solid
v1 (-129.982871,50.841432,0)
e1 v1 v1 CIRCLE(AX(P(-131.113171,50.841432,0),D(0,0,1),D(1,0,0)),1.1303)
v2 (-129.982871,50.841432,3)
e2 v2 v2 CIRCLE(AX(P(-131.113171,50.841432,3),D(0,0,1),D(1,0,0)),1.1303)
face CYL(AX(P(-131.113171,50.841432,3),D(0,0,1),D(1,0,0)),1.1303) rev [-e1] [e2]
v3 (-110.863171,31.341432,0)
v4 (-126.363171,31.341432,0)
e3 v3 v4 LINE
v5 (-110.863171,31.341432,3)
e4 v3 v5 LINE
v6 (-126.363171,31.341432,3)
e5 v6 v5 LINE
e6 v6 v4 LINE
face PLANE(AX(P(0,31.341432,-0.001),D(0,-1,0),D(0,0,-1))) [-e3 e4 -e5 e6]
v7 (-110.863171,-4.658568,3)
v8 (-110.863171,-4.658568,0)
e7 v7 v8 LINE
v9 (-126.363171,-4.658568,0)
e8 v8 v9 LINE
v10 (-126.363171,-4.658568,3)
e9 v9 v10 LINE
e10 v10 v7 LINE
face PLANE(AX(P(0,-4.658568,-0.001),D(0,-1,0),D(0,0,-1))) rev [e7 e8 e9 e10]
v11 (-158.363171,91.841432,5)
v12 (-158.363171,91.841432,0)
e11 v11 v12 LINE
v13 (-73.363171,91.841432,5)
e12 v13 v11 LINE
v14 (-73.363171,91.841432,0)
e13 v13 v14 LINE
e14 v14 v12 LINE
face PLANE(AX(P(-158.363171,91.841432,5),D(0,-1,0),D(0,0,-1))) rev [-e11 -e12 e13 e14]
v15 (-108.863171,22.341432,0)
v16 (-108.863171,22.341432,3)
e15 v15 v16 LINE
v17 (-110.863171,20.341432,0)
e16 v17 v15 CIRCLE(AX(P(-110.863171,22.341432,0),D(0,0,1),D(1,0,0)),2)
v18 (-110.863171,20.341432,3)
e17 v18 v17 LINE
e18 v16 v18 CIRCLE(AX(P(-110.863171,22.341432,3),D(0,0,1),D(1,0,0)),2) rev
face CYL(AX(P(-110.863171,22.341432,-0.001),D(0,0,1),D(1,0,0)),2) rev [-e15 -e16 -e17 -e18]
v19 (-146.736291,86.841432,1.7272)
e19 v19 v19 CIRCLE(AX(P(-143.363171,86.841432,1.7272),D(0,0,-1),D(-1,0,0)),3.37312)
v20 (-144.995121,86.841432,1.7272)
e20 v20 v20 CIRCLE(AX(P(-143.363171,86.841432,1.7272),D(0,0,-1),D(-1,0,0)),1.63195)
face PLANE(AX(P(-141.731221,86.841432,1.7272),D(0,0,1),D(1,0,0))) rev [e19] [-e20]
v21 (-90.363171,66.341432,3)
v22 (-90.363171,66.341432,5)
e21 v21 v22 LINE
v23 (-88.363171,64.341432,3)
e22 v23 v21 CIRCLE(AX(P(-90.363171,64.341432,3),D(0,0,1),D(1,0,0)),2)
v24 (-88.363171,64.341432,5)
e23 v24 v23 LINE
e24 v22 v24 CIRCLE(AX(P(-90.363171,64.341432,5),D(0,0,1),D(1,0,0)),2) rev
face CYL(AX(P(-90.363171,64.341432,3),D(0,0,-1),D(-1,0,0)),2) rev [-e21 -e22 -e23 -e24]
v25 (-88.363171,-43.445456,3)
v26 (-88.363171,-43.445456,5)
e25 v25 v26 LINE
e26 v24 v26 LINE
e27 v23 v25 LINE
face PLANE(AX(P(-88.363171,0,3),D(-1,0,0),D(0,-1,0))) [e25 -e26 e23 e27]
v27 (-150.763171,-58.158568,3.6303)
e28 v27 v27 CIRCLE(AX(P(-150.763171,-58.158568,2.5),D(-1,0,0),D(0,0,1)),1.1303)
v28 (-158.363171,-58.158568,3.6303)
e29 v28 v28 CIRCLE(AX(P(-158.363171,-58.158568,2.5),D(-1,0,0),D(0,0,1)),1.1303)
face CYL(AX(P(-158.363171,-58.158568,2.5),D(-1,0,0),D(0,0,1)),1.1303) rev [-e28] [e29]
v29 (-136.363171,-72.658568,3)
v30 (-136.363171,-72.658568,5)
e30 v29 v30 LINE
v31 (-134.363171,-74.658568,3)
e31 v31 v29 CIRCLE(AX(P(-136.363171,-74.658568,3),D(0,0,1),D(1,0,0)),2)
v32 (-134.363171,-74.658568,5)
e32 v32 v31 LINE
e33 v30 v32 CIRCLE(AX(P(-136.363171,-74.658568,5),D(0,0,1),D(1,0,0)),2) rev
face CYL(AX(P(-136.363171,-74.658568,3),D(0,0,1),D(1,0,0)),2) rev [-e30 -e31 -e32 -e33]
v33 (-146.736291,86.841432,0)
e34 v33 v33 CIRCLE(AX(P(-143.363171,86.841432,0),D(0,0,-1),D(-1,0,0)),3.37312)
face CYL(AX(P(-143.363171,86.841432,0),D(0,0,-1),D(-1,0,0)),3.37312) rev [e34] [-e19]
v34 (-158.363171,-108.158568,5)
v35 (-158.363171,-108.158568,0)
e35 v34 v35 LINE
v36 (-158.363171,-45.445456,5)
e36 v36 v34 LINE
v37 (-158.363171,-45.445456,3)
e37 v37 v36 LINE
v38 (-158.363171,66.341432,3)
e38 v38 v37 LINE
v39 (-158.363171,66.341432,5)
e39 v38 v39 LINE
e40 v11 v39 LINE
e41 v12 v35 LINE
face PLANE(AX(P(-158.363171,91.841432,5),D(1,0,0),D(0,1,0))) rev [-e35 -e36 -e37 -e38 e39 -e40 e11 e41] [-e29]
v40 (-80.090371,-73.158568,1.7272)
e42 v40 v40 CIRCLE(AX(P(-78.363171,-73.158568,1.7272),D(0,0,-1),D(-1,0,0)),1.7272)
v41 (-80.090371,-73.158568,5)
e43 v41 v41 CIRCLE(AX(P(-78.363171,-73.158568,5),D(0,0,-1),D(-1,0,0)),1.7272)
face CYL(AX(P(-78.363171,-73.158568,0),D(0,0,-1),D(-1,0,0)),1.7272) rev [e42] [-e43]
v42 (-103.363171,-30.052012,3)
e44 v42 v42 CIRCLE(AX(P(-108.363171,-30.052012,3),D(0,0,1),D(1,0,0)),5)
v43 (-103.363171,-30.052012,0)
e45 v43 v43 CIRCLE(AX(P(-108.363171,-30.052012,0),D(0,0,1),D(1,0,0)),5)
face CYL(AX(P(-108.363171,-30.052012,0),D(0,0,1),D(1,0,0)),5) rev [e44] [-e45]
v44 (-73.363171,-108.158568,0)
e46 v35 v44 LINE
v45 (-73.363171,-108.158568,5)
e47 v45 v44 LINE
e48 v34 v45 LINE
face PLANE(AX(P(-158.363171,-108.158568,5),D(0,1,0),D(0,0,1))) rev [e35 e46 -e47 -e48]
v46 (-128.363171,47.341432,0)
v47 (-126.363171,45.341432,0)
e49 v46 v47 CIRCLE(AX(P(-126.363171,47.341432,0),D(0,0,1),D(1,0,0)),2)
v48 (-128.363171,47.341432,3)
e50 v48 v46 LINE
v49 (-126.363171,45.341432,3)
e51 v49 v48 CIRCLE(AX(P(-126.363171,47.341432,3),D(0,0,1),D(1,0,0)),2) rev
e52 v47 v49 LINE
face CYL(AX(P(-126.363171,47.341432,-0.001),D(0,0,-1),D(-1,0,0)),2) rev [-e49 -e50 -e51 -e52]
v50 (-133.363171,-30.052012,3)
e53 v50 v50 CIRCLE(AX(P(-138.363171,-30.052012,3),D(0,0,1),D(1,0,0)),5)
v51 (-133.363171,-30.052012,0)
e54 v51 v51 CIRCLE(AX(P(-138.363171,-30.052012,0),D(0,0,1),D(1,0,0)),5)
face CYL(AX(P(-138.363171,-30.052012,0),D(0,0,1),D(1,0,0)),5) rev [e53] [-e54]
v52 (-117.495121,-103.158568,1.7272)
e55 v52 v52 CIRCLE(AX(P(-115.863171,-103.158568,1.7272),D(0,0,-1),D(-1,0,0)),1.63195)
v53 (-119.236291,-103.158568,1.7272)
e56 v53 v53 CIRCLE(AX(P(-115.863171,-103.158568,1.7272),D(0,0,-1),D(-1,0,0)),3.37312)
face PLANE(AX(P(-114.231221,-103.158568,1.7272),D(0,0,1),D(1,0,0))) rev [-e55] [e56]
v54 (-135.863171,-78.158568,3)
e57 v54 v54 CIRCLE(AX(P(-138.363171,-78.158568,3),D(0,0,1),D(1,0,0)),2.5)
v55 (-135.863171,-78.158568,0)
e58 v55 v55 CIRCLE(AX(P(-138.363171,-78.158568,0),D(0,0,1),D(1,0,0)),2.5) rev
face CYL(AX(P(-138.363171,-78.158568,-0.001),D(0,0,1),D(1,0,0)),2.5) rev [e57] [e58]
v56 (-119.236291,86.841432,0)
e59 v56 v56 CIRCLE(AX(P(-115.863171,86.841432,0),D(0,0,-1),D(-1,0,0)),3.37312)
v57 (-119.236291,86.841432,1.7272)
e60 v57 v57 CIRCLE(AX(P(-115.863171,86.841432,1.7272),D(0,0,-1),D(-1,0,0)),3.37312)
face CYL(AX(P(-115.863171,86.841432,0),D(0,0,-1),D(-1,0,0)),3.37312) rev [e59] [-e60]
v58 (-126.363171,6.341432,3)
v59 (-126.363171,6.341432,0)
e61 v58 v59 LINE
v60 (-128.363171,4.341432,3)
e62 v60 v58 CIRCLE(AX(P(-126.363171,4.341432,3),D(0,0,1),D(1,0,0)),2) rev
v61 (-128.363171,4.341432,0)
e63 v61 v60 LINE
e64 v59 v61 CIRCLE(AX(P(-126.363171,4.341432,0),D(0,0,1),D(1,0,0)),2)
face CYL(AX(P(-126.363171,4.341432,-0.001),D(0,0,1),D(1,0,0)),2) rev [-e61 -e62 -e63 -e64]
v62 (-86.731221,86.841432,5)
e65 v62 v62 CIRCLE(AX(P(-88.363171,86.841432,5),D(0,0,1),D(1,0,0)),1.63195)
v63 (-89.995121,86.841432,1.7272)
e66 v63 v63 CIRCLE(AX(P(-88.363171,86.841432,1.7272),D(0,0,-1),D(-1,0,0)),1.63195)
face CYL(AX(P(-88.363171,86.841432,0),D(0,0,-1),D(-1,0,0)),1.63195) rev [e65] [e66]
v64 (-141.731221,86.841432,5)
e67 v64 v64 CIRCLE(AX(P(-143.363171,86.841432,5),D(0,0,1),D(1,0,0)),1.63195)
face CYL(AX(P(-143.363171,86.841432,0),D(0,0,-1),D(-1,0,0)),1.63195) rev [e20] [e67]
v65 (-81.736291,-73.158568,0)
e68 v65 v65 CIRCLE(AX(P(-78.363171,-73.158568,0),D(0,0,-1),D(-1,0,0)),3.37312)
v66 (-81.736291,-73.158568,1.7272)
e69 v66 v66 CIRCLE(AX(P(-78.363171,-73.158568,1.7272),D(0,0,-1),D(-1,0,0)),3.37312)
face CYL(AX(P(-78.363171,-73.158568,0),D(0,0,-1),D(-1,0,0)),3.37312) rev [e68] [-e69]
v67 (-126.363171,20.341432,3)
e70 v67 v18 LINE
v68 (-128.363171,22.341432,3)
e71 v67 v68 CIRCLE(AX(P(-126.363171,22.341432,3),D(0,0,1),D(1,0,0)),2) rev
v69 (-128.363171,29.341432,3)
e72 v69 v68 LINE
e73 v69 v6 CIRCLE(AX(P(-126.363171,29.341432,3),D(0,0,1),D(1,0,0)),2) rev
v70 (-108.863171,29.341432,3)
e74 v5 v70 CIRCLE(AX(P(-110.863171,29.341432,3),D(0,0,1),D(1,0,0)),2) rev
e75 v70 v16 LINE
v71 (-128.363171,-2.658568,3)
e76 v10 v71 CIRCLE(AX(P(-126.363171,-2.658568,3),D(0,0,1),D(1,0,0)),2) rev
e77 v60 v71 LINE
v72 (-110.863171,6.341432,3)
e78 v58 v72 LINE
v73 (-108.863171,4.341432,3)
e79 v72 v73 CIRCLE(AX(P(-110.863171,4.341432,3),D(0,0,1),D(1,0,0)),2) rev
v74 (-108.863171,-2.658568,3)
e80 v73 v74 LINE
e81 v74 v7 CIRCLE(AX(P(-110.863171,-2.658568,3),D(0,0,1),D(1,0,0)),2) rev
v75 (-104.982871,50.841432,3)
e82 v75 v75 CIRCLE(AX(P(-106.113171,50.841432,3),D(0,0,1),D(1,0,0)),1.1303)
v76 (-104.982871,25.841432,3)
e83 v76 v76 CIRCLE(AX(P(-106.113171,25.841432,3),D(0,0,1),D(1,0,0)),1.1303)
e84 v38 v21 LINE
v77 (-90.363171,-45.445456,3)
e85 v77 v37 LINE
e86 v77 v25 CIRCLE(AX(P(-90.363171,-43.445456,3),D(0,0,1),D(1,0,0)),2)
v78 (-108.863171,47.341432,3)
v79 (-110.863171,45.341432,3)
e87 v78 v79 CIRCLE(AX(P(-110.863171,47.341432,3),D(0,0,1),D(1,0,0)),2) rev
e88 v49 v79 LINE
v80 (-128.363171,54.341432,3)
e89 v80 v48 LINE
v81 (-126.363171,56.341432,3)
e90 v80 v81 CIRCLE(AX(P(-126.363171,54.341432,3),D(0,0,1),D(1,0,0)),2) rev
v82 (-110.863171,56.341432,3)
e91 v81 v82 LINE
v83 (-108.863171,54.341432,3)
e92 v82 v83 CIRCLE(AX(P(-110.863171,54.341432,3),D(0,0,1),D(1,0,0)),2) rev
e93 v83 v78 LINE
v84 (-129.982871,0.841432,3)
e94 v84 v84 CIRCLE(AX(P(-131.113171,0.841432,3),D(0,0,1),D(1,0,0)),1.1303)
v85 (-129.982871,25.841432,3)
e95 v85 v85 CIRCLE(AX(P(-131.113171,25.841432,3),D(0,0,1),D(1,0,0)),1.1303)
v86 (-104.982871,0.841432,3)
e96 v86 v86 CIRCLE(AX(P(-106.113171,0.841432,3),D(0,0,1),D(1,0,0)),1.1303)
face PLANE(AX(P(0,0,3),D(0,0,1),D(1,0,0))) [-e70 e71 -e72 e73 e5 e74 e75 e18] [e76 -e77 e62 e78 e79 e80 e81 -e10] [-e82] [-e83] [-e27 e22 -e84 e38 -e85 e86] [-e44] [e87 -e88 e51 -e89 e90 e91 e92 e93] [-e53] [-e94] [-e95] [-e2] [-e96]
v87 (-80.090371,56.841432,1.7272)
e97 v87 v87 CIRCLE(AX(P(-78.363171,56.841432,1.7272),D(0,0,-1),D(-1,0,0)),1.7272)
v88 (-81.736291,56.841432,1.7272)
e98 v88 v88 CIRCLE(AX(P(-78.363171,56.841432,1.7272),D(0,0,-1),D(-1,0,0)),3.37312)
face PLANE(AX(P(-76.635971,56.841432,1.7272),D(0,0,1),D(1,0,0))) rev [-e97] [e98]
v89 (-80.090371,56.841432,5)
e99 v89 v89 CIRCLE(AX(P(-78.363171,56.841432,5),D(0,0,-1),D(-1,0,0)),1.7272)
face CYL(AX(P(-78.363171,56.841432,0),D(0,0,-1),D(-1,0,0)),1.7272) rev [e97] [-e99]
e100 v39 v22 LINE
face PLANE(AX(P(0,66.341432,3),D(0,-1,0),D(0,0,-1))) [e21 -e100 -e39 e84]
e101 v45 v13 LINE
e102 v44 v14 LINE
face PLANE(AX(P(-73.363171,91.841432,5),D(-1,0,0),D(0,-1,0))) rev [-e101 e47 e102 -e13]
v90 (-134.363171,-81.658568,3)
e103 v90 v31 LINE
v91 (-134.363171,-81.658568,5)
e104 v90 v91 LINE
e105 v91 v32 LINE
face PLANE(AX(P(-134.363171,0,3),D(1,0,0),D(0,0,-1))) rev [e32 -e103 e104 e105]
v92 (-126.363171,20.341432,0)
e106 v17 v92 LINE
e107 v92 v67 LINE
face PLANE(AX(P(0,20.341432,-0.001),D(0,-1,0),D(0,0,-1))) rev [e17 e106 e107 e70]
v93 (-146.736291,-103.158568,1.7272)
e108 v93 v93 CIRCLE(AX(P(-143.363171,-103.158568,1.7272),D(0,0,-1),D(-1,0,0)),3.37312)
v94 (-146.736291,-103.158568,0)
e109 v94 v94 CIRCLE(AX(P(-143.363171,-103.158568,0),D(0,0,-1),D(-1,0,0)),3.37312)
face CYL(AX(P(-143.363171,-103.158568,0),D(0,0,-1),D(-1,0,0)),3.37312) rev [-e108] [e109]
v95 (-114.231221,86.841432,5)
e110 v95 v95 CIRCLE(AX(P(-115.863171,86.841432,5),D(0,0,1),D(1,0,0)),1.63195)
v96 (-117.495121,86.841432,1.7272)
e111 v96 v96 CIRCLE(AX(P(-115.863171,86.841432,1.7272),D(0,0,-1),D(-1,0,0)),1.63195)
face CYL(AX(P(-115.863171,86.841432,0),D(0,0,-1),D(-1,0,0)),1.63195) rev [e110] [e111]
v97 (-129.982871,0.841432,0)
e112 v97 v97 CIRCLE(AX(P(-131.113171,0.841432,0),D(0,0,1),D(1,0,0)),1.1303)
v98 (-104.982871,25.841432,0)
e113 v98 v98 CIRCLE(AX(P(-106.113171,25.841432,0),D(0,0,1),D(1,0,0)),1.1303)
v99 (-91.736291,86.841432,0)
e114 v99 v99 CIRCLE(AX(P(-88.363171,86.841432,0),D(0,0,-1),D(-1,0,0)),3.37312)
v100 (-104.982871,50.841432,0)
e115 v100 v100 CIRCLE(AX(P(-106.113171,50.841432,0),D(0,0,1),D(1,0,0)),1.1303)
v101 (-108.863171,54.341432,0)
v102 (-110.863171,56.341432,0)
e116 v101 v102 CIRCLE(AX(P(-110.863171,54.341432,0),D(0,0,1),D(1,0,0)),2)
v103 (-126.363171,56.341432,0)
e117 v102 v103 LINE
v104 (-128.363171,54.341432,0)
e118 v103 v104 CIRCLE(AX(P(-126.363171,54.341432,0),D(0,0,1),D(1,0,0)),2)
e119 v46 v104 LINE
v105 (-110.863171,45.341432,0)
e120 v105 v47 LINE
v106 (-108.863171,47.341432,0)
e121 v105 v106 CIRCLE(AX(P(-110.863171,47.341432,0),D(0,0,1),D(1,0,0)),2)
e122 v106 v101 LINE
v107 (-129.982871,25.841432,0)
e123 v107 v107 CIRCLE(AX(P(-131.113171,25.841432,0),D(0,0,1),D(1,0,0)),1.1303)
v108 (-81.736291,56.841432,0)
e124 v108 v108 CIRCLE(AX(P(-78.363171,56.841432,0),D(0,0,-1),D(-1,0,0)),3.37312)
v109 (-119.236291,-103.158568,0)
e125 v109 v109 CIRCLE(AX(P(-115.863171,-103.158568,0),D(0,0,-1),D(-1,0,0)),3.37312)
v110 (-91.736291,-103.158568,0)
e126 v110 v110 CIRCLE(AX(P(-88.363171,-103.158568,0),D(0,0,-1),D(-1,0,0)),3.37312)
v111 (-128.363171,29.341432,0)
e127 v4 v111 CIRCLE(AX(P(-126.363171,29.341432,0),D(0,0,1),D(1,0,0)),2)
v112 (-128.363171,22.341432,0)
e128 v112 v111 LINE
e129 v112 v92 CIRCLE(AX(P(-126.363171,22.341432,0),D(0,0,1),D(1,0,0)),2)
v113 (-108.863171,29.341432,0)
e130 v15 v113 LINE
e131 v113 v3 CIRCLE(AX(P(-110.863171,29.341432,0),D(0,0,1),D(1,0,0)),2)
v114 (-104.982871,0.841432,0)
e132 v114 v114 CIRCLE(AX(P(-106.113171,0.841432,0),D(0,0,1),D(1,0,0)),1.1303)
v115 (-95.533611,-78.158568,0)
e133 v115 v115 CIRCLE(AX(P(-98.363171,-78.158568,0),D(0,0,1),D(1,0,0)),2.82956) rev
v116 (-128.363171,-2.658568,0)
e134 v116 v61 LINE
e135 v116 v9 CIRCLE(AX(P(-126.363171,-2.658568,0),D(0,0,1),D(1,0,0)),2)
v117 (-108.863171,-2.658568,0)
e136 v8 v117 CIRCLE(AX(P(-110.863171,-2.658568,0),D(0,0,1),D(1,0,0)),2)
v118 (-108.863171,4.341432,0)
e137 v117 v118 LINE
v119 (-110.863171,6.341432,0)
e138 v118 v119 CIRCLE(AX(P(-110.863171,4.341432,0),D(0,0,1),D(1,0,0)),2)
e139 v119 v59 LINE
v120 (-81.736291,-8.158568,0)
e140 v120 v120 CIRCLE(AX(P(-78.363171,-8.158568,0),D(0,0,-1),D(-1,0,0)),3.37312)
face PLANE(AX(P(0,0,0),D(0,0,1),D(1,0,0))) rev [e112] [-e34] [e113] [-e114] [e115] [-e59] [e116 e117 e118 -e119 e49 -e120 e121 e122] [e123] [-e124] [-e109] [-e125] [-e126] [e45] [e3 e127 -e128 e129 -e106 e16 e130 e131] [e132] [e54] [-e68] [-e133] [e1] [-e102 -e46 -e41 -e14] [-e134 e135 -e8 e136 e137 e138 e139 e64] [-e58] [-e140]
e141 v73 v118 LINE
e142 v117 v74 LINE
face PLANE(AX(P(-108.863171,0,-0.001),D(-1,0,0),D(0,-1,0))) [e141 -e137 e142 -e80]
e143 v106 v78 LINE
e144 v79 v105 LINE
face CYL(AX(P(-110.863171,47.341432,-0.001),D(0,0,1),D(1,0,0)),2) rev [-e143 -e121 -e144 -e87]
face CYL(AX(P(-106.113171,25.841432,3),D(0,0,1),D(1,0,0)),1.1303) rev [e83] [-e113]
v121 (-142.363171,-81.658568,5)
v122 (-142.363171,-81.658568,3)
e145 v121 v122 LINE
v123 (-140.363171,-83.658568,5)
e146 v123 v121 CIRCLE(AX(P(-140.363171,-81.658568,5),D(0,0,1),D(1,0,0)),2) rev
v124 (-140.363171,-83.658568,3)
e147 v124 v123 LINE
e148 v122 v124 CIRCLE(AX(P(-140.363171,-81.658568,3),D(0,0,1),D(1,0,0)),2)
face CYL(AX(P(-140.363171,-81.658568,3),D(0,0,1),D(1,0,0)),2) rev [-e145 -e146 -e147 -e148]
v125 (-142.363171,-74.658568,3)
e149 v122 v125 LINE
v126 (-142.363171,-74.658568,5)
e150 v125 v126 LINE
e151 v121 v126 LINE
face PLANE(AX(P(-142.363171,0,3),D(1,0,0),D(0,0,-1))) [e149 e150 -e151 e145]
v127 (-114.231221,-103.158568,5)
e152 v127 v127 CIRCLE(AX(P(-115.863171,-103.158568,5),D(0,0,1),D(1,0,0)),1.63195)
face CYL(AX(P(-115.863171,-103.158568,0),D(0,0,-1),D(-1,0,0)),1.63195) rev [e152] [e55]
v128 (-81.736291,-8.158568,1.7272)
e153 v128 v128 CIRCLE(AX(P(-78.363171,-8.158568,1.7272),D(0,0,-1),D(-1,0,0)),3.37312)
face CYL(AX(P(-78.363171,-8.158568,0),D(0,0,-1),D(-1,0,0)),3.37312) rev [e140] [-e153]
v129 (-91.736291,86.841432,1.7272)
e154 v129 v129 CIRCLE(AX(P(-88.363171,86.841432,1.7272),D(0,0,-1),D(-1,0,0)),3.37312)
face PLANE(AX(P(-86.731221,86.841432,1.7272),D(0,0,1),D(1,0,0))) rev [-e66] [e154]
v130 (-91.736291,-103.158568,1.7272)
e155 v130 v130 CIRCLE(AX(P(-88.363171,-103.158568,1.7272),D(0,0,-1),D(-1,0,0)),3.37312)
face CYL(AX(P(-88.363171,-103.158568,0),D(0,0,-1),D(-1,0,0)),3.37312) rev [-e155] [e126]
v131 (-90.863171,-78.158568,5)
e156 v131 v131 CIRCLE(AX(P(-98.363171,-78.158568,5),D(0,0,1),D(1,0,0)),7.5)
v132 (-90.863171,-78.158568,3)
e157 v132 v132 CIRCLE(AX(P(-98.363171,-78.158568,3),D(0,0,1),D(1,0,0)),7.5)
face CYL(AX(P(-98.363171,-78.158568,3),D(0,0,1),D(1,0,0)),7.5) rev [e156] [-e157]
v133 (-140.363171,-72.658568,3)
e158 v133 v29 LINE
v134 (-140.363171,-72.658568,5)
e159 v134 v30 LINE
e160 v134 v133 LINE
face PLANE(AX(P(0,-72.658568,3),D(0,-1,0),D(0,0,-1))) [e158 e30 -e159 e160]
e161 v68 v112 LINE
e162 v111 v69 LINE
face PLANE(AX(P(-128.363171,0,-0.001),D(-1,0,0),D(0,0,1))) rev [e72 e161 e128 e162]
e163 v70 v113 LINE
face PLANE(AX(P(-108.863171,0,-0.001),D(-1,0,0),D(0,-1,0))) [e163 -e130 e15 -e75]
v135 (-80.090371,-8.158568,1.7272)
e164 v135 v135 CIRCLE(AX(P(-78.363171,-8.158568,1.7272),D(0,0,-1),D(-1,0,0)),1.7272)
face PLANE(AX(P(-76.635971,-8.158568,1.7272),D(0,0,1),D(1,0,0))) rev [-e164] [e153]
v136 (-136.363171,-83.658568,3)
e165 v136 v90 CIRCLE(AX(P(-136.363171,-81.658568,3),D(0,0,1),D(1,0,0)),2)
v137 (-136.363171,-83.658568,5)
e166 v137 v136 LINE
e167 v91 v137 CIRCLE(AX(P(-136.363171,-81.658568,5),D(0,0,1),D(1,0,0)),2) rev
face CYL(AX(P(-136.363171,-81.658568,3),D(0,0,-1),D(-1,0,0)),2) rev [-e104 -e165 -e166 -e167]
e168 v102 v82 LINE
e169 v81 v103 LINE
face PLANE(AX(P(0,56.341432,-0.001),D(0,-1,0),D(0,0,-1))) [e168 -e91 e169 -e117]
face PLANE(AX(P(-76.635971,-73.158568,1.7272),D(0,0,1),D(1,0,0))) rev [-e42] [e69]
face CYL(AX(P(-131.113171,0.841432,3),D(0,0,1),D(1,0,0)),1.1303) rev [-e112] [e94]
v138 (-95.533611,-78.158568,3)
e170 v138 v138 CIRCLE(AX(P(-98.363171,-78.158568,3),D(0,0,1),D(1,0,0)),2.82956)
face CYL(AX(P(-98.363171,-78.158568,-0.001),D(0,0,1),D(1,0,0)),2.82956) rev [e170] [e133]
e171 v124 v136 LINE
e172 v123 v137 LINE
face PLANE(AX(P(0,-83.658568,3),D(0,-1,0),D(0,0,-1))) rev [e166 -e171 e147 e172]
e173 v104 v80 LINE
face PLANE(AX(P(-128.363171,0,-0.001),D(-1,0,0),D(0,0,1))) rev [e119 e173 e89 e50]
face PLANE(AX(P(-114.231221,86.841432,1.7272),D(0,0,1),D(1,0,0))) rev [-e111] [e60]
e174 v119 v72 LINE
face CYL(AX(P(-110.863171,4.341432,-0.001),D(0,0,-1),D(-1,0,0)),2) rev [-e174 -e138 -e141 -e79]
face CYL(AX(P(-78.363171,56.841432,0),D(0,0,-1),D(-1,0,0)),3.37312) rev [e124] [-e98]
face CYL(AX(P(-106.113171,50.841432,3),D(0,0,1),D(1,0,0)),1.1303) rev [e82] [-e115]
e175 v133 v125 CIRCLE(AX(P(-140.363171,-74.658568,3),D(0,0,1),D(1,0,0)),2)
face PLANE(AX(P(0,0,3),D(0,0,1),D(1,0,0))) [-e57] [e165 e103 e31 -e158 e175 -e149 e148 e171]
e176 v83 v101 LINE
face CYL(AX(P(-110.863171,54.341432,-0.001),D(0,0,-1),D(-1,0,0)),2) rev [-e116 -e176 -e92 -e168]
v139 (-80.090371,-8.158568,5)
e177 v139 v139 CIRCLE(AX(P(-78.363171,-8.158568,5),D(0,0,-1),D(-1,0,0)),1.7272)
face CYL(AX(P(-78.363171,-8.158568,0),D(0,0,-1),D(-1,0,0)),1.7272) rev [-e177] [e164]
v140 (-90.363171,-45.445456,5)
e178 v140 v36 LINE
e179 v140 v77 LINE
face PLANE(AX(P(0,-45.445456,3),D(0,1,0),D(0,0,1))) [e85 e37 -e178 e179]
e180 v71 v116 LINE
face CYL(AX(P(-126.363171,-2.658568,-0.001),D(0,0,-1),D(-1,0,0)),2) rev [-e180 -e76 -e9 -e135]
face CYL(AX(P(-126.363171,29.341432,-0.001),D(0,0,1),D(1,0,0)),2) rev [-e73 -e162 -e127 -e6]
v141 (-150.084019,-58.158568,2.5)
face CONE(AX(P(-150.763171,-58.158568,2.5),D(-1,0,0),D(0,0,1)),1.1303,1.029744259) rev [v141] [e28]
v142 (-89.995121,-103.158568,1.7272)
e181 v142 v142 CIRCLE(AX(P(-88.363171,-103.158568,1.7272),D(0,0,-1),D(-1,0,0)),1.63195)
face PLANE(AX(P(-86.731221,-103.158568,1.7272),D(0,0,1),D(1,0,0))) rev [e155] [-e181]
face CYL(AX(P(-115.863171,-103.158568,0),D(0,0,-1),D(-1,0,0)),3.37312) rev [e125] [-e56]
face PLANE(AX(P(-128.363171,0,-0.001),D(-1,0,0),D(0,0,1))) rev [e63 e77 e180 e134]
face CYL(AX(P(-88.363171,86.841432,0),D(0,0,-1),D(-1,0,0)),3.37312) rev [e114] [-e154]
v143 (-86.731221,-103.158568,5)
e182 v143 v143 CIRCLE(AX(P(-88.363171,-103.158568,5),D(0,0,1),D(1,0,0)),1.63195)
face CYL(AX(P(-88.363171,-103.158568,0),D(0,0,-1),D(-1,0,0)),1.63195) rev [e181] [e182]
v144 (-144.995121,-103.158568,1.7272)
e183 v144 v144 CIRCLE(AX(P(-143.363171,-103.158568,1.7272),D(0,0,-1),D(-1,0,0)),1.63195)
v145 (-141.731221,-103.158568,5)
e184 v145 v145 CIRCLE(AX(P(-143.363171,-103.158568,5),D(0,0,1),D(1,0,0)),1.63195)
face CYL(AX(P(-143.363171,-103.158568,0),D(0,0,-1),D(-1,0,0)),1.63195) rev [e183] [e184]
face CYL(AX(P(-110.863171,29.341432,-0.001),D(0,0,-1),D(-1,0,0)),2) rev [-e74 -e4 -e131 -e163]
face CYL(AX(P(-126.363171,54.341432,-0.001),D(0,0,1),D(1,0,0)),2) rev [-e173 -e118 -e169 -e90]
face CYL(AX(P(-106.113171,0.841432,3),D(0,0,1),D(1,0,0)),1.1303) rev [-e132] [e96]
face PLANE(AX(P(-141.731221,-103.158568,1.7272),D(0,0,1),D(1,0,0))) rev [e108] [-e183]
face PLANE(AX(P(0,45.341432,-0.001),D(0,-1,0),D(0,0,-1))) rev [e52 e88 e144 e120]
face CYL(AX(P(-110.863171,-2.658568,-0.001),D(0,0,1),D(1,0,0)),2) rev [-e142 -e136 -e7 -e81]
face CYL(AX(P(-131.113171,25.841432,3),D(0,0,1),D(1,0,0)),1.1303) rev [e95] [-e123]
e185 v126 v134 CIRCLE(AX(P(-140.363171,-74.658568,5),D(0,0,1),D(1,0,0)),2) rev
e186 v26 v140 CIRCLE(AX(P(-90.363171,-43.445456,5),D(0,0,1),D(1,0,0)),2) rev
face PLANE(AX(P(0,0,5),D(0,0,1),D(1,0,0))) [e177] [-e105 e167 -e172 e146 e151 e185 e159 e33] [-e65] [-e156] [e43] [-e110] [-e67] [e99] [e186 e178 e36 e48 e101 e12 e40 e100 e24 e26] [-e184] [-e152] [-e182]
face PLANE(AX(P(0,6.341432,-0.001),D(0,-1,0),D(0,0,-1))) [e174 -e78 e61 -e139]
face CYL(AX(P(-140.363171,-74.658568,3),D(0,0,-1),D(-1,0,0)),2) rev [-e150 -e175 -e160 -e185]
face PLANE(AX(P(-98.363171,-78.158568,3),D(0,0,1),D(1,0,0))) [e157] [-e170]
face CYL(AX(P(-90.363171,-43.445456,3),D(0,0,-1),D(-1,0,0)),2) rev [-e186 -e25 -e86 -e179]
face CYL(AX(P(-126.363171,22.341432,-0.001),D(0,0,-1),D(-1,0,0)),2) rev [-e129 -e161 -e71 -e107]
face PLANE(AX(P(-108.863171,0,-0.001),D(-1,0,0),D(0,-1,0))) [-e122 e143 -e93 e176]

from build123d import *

# Parameters (mm, degrees)
SKETCH1_W                                           = 85
SKETCH1_H                                           = 200
BOSS_EXTRUDE1_DEPTH                                 = 5
SKETCH2_3_R                                         = 2.5
LED_THRU_HOLE_DEPTH                                 = 5
F_1_4_40_THREADED_THROUGH_HOLE_REACH                = 193.839
SKETCH3_R                                           = 2.82956
CBORE_FOR_4_BINDING_HEAD_MACHINE_SCREW1_D           = 3.4544
CBORE_FOR_4_BINDING_HEAD_MACHINE_SCREW1_CBORE_D     = 6.74624
CBORE_FOR_4_BINDING_HEAD_MACHINE_SCREW1_CBORE_DEPTH = 1.7272
SKETCH2_7_W                                         = 19.5
SKETCH2_7_H                                         = 11
RS232_FEEDTHRUS_DEPTH                               = 5
ELECTRONICS_START                                   = 3
ELECTRONICS_RECESS_OUTLINE_W                        = 70
ELECTRONICS_RECESS_OUTLINE_H                        = 111.786888031
ELECTRONICS_RECESS_OUTLINE_R                        = 5
ELECTRONICS_RECESS_OUTLINE_W_2                      = 19.5
ELECTRONICS_RECESS_OUTLINE_H_2                      = 11
ELECTRONICS_RECESS_OUTLINE_W_3                      = 8
ELECTRONICS_RECESS_OUTLINE_R_2                      = 2.5
ELECTRONICS_RECESS_DEPTH                            = 2
FILLET4_R                                           = 2
CBORE_FOR_4_BINDING_HEAD_MACHINE_SCREW2_D           = 3.2639
CBORE_FOR_4_BINDING_HEAD_MACHINE_SCREW2_CBORE_D     = 6.74624
CBORE_FOR_4_BINDING_HEAD_MACHINE_SCREW2_CBORE_DEPTH = 1.7272
F_4_40_TAPPED_HOLE1_D                               = 2.2606
F_4_40_TAPPED_HOLE1_DEPTH                           = 7.6
F_4_40_TAPPED_HOLE1_TIP                             = 0.679152758
F_4_40_TAPPED_HOLE3_D                               = 2.2606
SKETCH3_4_R                                         = 7.5
SKETCH3_4_R_2                                       = 2.82956
CUT_EXTRUDE1_DEPTH                                  = 2
SKETCH2_11_R                                        = 5
CUT_EXTRUDE2_DEPTH                                  = 192.838916346


# Read off the part's stored shape, not the designer's step: electronics recess
with BuildPart() as part:
    # Sketch1 → Boss-Extrude1 (new body)
    with BuildSketch(Plane.XY):
        with Locations((-115.863171355, -8.158567775)):
            Rectangle(SKETCH1_W, SKETCH1_H)
    extrude(amount=BOSS_EXTRUDE1_DEPTH)

    # Sketch2<3> (on Front Plane) → LED thru hole (cut)
    with BuildSketch(Plane.XY):
        with Locations((-138.363171355, -78.158567775)):
            Circle(SKETCH2_3_R)
    extrude(amount=LED_THRU_HOLE_DEPTH, mode=Mode.SUBTRACT)

    # Sketch3 → 1/4-40 threaded through hole (cut, up to next)
    with BuildSketch(Plane.XY.offset(5), mode=Mode.PRIVATE) as f_1_4_40_threaded_through_hole_sk1:
        with Locations((-98.363171355, -78.158567775)):
            Circle(SKETCH3_R)
    f_1_4_40_threaded_through_hole_tool1 = extrude(f_1_4_40_threaded_through_hole_sk1.sketch, amount=-F_1_4_40_THREADED_THROUGH_HOLE_REACH, mode=Mode.PRIVATE) & part.part
    add(f_1_4_40_threaded_through_hole_tool1.solids().sort_by_distance((-98.363171, -78.158568, 5))[0], mode=Mode.SUBTRACT)

    # CBORE for #4 Binding Head Machine Screw1 (through all)
    with Locations(Plane(origin=(0, 0, 0), x_dir=(-1, 0, 0), z_dir=(0, 0, -1))):
        with Locations((78.363171355, 56.841432225), (78.363171355, -8.158567775), (78.363171355, -73.158567775)):
            CounterBoreHole(CBORE_FOR_4_BINDING_HEAD_MACHINE_SCREW1_D / 2, CBORE_FOR_4_BINDING_HEAD_MACHINE_SCREW1_CBORE_D / 2, CBORE_FOR_4_BINDING_HEAD_MACHINE_SCREW1_CBORE_DEPTH)

    # Sketch2<7> (on Front Plane) → RS232 feedthrus (cut)
    with BuildSketch(Plane.XY):
        with Locations((-118.613171355, 50.841432225)):
            Rectangle(SKETCH2_7_W, SKETCH2_7_H)
        with Locations((-118.613171355, 25.841432225)):
            Rectangle(SKETCH2_7_W, SKETCH2_7_H)
        with Locations((-118.613171355, 0.841432225)):
            Rectangle(SKETCH2_7_W, SKETCH2_7_H)
    extrude(amount=RS232_FEEDTHRUS_DEPTH, mode=Mode.SUBTRACT)

    # electronics recess outline → electronics recess (cut)
    # profile 1 of 2: a face of its own
    with BuildSketch(Plane.XY.offset(ELECTRONICS_START)):
        with Locations((-123.363171355, 10.44798821)):
            Rectangle(ELECTRONICS_RECESS_OUTLINE_W, ELECTRONICS_RECESS_OUTLINE_H)
        with Locations((-138.363171355, -30.052011791)):
            Circle(ELECTRONICS_RECESS_OUTLINE_R, mode=Mode.SUBTRACT)
        with Locations((-108.363171355, -30.052011791)):
            Circle(ELECTRONICS_RECESS_OUTLINE_R, mode=Mode.SUBTRACT)
        with Locations((-118.613171355, 0.841432225)):
            Rectangle(ELECTRONICS_RECESS_OUTLINE_W_2, ELECTRONICS_RECESS_OUTLINE_H_2, mode=Mode.SUBTRACT)
        with Locations((-118.613171355, 25.841432225)):
            Rectangle(ELECTRONICS_RECESS_OUTLINE_W_2, ELECTRONICS_RECESS_OUTLINE_H_2, mode=Mode.SUBTRACT)
        with Locations((-118.613171355, 50.841432225)):
            Rectangle(ELECTRONICS_RECESS_OUTLINE_W_2, ELECTRONICS_RECESS_OUTLINE_H_2, mode=Mode.SUBTRACT)
    # profile 2 of 2: a face of its own
    with BuildSketch(Plane.XY.offset(ELECTRONICS_START)):
        with Locations((-138.363171355, -78.158567775)):
            Rectangle(ELECTRONICS_RECESS_OUTLINE_W_3, ELECTRONICS_RECESS_OUTLINE_H_2)
        with Locations((-138.363171355, -78.158567775)):
            Circle(ELECTRONICS_RECESS_OUTLINE_R_2, mode=Mode.SUBTRACT)
    extrude(amount=ELECTRONICS_RECESS_DEPTH, mode=Mode.SUBTRACT)

    # Fillet4
    fillet4_edges = [part.edges().sort_by_distance(p)[0] for p in [
        (-134.363171355, -83.658567775, 4),
        (-142.363171355, -83.658567775, 4),
        (-142.363171355, -72.658567775, 4),
        (-134.363171355, -72.658567775, 4),
        (-88.363171355, -45.445455806, 4),
        (-88.363171355, 66.341432225, 4),
        (-128.363171355, 45.341432225, 1.5),
        (-128.363171355, 56.341432225, 1.5),
        (-108.863171355, 56.341432225, 1.5),
        (-108.863171355, 45.341432225, 1.5),
        (-128.363171355, 20.341432225, 1.5),
        (-128.363171355, 31.341432225, 1.5),
        (-108.863171355, 31.341432225, 1.5),
        (-108.863171355, 20.341432225, 1.5),
        (-108.863171355, 6.341432225, 1.5),
        (-108.863171355, -4.658567775, 1.5),
        (-128.363171355, -4.658567775, 1.5),
        (-128.363171355, 6.341432225, 1.5),
    ]]
    fillet(fillet4_edges, radius=FILLET4_R)

    # CBORE for #4 Binding Head Machine Screw2 (through all)
    with Locations(Plane(origin=(0, 0, 0), x_dir=(-1, 0, 0), z_dir=(0, 0, -1))):
        with Locations((143.363171355, 86.841432225), (115.863171355, 86.841432225), (88.363171355, 86.841432225), (88.363171355, -103.158567775), (115.863171355, -103.158567775), (143.363171355, -103.158567775)):
            CounterBoreHole(CBORE_FOR_4_BINDING_HEAD_MACHINE_SCREW2_D / 2, CBORE_FOR_4_BINDING_HEAD_MACHINE_SCREW2_CBORE_D / 2, CBORE_FOR_4_BINDING_HEAD_MACHINE_SCREW2_CBORE_DEPTH)

    # #4-40 Tapped Hole1
    with Locations(Plane.ZY.offset(158.363171355)):
        with Locations((2.5, -58.158567775)):
            Hole(F_4_40_TAPPED_HOLE1_D / 2, depth=F_4_40_TAPPED_HOLE1_DEPTH)
            with Locations((0, 0, -(F_4_40_TAPPED_HOLE1_DEPTH + F_4_40_TAPPED_HOLE1_TIP / 2))):  # 118° drill point
                Cone(0, F_4_40_TAPPED_HOLE1_D / 2, F_4_40_TAPPED_HOLE1_TIP, mode=Mode.SUBTRACT)

    # #4-40 Tapped Hole3 (through all)
    with Locations(Plane.XY.offset(3)):
        with Locations((-131.113171355, 50.841432225), (-106.113171355, 50.841432225), (-106.113171355, 25.841432225), (-131.113171355, 25.841432225), (-131.113171355, 0.841432225), (-106.113171355, 0.841432225)):
            Hole(F_4_40_TAPPED_HOLE3_D / 2)

    # Sketch3<4> → Cut-Extrude1 (cut)
    with BuildSketch(Plane.XY.offset(5)):
        with Locations((-98.363171355, -78.158567775)):
            Circle(SKETCH3_4_R)
        with Locations((-98.363171355, -78.158567775)):
            Circle(SKETCH3_4_R_2, mode=Mode.SUBTRACT)
    extrude(amount=-CUT_EXTRUDE1_DEPTH, mode=Mode.SUBTRACT)

    # Sketch2<11> (on Front Plane) → Cut-Extrude2 (cut, through all)
    with BuildSketch(Plane.XY):
        with Locations((-138.363171355, -30.052011791)):
            Circle(SKETCH2_11_R)
        with Locations((-108.363171355, -30.052011791)):
            Circle(SKETCH2_11_R)
    extrude(amount=CUT_EXTRUDE2_DEPTH, mode=Mode.SUBTRACT)


solid = part.part
